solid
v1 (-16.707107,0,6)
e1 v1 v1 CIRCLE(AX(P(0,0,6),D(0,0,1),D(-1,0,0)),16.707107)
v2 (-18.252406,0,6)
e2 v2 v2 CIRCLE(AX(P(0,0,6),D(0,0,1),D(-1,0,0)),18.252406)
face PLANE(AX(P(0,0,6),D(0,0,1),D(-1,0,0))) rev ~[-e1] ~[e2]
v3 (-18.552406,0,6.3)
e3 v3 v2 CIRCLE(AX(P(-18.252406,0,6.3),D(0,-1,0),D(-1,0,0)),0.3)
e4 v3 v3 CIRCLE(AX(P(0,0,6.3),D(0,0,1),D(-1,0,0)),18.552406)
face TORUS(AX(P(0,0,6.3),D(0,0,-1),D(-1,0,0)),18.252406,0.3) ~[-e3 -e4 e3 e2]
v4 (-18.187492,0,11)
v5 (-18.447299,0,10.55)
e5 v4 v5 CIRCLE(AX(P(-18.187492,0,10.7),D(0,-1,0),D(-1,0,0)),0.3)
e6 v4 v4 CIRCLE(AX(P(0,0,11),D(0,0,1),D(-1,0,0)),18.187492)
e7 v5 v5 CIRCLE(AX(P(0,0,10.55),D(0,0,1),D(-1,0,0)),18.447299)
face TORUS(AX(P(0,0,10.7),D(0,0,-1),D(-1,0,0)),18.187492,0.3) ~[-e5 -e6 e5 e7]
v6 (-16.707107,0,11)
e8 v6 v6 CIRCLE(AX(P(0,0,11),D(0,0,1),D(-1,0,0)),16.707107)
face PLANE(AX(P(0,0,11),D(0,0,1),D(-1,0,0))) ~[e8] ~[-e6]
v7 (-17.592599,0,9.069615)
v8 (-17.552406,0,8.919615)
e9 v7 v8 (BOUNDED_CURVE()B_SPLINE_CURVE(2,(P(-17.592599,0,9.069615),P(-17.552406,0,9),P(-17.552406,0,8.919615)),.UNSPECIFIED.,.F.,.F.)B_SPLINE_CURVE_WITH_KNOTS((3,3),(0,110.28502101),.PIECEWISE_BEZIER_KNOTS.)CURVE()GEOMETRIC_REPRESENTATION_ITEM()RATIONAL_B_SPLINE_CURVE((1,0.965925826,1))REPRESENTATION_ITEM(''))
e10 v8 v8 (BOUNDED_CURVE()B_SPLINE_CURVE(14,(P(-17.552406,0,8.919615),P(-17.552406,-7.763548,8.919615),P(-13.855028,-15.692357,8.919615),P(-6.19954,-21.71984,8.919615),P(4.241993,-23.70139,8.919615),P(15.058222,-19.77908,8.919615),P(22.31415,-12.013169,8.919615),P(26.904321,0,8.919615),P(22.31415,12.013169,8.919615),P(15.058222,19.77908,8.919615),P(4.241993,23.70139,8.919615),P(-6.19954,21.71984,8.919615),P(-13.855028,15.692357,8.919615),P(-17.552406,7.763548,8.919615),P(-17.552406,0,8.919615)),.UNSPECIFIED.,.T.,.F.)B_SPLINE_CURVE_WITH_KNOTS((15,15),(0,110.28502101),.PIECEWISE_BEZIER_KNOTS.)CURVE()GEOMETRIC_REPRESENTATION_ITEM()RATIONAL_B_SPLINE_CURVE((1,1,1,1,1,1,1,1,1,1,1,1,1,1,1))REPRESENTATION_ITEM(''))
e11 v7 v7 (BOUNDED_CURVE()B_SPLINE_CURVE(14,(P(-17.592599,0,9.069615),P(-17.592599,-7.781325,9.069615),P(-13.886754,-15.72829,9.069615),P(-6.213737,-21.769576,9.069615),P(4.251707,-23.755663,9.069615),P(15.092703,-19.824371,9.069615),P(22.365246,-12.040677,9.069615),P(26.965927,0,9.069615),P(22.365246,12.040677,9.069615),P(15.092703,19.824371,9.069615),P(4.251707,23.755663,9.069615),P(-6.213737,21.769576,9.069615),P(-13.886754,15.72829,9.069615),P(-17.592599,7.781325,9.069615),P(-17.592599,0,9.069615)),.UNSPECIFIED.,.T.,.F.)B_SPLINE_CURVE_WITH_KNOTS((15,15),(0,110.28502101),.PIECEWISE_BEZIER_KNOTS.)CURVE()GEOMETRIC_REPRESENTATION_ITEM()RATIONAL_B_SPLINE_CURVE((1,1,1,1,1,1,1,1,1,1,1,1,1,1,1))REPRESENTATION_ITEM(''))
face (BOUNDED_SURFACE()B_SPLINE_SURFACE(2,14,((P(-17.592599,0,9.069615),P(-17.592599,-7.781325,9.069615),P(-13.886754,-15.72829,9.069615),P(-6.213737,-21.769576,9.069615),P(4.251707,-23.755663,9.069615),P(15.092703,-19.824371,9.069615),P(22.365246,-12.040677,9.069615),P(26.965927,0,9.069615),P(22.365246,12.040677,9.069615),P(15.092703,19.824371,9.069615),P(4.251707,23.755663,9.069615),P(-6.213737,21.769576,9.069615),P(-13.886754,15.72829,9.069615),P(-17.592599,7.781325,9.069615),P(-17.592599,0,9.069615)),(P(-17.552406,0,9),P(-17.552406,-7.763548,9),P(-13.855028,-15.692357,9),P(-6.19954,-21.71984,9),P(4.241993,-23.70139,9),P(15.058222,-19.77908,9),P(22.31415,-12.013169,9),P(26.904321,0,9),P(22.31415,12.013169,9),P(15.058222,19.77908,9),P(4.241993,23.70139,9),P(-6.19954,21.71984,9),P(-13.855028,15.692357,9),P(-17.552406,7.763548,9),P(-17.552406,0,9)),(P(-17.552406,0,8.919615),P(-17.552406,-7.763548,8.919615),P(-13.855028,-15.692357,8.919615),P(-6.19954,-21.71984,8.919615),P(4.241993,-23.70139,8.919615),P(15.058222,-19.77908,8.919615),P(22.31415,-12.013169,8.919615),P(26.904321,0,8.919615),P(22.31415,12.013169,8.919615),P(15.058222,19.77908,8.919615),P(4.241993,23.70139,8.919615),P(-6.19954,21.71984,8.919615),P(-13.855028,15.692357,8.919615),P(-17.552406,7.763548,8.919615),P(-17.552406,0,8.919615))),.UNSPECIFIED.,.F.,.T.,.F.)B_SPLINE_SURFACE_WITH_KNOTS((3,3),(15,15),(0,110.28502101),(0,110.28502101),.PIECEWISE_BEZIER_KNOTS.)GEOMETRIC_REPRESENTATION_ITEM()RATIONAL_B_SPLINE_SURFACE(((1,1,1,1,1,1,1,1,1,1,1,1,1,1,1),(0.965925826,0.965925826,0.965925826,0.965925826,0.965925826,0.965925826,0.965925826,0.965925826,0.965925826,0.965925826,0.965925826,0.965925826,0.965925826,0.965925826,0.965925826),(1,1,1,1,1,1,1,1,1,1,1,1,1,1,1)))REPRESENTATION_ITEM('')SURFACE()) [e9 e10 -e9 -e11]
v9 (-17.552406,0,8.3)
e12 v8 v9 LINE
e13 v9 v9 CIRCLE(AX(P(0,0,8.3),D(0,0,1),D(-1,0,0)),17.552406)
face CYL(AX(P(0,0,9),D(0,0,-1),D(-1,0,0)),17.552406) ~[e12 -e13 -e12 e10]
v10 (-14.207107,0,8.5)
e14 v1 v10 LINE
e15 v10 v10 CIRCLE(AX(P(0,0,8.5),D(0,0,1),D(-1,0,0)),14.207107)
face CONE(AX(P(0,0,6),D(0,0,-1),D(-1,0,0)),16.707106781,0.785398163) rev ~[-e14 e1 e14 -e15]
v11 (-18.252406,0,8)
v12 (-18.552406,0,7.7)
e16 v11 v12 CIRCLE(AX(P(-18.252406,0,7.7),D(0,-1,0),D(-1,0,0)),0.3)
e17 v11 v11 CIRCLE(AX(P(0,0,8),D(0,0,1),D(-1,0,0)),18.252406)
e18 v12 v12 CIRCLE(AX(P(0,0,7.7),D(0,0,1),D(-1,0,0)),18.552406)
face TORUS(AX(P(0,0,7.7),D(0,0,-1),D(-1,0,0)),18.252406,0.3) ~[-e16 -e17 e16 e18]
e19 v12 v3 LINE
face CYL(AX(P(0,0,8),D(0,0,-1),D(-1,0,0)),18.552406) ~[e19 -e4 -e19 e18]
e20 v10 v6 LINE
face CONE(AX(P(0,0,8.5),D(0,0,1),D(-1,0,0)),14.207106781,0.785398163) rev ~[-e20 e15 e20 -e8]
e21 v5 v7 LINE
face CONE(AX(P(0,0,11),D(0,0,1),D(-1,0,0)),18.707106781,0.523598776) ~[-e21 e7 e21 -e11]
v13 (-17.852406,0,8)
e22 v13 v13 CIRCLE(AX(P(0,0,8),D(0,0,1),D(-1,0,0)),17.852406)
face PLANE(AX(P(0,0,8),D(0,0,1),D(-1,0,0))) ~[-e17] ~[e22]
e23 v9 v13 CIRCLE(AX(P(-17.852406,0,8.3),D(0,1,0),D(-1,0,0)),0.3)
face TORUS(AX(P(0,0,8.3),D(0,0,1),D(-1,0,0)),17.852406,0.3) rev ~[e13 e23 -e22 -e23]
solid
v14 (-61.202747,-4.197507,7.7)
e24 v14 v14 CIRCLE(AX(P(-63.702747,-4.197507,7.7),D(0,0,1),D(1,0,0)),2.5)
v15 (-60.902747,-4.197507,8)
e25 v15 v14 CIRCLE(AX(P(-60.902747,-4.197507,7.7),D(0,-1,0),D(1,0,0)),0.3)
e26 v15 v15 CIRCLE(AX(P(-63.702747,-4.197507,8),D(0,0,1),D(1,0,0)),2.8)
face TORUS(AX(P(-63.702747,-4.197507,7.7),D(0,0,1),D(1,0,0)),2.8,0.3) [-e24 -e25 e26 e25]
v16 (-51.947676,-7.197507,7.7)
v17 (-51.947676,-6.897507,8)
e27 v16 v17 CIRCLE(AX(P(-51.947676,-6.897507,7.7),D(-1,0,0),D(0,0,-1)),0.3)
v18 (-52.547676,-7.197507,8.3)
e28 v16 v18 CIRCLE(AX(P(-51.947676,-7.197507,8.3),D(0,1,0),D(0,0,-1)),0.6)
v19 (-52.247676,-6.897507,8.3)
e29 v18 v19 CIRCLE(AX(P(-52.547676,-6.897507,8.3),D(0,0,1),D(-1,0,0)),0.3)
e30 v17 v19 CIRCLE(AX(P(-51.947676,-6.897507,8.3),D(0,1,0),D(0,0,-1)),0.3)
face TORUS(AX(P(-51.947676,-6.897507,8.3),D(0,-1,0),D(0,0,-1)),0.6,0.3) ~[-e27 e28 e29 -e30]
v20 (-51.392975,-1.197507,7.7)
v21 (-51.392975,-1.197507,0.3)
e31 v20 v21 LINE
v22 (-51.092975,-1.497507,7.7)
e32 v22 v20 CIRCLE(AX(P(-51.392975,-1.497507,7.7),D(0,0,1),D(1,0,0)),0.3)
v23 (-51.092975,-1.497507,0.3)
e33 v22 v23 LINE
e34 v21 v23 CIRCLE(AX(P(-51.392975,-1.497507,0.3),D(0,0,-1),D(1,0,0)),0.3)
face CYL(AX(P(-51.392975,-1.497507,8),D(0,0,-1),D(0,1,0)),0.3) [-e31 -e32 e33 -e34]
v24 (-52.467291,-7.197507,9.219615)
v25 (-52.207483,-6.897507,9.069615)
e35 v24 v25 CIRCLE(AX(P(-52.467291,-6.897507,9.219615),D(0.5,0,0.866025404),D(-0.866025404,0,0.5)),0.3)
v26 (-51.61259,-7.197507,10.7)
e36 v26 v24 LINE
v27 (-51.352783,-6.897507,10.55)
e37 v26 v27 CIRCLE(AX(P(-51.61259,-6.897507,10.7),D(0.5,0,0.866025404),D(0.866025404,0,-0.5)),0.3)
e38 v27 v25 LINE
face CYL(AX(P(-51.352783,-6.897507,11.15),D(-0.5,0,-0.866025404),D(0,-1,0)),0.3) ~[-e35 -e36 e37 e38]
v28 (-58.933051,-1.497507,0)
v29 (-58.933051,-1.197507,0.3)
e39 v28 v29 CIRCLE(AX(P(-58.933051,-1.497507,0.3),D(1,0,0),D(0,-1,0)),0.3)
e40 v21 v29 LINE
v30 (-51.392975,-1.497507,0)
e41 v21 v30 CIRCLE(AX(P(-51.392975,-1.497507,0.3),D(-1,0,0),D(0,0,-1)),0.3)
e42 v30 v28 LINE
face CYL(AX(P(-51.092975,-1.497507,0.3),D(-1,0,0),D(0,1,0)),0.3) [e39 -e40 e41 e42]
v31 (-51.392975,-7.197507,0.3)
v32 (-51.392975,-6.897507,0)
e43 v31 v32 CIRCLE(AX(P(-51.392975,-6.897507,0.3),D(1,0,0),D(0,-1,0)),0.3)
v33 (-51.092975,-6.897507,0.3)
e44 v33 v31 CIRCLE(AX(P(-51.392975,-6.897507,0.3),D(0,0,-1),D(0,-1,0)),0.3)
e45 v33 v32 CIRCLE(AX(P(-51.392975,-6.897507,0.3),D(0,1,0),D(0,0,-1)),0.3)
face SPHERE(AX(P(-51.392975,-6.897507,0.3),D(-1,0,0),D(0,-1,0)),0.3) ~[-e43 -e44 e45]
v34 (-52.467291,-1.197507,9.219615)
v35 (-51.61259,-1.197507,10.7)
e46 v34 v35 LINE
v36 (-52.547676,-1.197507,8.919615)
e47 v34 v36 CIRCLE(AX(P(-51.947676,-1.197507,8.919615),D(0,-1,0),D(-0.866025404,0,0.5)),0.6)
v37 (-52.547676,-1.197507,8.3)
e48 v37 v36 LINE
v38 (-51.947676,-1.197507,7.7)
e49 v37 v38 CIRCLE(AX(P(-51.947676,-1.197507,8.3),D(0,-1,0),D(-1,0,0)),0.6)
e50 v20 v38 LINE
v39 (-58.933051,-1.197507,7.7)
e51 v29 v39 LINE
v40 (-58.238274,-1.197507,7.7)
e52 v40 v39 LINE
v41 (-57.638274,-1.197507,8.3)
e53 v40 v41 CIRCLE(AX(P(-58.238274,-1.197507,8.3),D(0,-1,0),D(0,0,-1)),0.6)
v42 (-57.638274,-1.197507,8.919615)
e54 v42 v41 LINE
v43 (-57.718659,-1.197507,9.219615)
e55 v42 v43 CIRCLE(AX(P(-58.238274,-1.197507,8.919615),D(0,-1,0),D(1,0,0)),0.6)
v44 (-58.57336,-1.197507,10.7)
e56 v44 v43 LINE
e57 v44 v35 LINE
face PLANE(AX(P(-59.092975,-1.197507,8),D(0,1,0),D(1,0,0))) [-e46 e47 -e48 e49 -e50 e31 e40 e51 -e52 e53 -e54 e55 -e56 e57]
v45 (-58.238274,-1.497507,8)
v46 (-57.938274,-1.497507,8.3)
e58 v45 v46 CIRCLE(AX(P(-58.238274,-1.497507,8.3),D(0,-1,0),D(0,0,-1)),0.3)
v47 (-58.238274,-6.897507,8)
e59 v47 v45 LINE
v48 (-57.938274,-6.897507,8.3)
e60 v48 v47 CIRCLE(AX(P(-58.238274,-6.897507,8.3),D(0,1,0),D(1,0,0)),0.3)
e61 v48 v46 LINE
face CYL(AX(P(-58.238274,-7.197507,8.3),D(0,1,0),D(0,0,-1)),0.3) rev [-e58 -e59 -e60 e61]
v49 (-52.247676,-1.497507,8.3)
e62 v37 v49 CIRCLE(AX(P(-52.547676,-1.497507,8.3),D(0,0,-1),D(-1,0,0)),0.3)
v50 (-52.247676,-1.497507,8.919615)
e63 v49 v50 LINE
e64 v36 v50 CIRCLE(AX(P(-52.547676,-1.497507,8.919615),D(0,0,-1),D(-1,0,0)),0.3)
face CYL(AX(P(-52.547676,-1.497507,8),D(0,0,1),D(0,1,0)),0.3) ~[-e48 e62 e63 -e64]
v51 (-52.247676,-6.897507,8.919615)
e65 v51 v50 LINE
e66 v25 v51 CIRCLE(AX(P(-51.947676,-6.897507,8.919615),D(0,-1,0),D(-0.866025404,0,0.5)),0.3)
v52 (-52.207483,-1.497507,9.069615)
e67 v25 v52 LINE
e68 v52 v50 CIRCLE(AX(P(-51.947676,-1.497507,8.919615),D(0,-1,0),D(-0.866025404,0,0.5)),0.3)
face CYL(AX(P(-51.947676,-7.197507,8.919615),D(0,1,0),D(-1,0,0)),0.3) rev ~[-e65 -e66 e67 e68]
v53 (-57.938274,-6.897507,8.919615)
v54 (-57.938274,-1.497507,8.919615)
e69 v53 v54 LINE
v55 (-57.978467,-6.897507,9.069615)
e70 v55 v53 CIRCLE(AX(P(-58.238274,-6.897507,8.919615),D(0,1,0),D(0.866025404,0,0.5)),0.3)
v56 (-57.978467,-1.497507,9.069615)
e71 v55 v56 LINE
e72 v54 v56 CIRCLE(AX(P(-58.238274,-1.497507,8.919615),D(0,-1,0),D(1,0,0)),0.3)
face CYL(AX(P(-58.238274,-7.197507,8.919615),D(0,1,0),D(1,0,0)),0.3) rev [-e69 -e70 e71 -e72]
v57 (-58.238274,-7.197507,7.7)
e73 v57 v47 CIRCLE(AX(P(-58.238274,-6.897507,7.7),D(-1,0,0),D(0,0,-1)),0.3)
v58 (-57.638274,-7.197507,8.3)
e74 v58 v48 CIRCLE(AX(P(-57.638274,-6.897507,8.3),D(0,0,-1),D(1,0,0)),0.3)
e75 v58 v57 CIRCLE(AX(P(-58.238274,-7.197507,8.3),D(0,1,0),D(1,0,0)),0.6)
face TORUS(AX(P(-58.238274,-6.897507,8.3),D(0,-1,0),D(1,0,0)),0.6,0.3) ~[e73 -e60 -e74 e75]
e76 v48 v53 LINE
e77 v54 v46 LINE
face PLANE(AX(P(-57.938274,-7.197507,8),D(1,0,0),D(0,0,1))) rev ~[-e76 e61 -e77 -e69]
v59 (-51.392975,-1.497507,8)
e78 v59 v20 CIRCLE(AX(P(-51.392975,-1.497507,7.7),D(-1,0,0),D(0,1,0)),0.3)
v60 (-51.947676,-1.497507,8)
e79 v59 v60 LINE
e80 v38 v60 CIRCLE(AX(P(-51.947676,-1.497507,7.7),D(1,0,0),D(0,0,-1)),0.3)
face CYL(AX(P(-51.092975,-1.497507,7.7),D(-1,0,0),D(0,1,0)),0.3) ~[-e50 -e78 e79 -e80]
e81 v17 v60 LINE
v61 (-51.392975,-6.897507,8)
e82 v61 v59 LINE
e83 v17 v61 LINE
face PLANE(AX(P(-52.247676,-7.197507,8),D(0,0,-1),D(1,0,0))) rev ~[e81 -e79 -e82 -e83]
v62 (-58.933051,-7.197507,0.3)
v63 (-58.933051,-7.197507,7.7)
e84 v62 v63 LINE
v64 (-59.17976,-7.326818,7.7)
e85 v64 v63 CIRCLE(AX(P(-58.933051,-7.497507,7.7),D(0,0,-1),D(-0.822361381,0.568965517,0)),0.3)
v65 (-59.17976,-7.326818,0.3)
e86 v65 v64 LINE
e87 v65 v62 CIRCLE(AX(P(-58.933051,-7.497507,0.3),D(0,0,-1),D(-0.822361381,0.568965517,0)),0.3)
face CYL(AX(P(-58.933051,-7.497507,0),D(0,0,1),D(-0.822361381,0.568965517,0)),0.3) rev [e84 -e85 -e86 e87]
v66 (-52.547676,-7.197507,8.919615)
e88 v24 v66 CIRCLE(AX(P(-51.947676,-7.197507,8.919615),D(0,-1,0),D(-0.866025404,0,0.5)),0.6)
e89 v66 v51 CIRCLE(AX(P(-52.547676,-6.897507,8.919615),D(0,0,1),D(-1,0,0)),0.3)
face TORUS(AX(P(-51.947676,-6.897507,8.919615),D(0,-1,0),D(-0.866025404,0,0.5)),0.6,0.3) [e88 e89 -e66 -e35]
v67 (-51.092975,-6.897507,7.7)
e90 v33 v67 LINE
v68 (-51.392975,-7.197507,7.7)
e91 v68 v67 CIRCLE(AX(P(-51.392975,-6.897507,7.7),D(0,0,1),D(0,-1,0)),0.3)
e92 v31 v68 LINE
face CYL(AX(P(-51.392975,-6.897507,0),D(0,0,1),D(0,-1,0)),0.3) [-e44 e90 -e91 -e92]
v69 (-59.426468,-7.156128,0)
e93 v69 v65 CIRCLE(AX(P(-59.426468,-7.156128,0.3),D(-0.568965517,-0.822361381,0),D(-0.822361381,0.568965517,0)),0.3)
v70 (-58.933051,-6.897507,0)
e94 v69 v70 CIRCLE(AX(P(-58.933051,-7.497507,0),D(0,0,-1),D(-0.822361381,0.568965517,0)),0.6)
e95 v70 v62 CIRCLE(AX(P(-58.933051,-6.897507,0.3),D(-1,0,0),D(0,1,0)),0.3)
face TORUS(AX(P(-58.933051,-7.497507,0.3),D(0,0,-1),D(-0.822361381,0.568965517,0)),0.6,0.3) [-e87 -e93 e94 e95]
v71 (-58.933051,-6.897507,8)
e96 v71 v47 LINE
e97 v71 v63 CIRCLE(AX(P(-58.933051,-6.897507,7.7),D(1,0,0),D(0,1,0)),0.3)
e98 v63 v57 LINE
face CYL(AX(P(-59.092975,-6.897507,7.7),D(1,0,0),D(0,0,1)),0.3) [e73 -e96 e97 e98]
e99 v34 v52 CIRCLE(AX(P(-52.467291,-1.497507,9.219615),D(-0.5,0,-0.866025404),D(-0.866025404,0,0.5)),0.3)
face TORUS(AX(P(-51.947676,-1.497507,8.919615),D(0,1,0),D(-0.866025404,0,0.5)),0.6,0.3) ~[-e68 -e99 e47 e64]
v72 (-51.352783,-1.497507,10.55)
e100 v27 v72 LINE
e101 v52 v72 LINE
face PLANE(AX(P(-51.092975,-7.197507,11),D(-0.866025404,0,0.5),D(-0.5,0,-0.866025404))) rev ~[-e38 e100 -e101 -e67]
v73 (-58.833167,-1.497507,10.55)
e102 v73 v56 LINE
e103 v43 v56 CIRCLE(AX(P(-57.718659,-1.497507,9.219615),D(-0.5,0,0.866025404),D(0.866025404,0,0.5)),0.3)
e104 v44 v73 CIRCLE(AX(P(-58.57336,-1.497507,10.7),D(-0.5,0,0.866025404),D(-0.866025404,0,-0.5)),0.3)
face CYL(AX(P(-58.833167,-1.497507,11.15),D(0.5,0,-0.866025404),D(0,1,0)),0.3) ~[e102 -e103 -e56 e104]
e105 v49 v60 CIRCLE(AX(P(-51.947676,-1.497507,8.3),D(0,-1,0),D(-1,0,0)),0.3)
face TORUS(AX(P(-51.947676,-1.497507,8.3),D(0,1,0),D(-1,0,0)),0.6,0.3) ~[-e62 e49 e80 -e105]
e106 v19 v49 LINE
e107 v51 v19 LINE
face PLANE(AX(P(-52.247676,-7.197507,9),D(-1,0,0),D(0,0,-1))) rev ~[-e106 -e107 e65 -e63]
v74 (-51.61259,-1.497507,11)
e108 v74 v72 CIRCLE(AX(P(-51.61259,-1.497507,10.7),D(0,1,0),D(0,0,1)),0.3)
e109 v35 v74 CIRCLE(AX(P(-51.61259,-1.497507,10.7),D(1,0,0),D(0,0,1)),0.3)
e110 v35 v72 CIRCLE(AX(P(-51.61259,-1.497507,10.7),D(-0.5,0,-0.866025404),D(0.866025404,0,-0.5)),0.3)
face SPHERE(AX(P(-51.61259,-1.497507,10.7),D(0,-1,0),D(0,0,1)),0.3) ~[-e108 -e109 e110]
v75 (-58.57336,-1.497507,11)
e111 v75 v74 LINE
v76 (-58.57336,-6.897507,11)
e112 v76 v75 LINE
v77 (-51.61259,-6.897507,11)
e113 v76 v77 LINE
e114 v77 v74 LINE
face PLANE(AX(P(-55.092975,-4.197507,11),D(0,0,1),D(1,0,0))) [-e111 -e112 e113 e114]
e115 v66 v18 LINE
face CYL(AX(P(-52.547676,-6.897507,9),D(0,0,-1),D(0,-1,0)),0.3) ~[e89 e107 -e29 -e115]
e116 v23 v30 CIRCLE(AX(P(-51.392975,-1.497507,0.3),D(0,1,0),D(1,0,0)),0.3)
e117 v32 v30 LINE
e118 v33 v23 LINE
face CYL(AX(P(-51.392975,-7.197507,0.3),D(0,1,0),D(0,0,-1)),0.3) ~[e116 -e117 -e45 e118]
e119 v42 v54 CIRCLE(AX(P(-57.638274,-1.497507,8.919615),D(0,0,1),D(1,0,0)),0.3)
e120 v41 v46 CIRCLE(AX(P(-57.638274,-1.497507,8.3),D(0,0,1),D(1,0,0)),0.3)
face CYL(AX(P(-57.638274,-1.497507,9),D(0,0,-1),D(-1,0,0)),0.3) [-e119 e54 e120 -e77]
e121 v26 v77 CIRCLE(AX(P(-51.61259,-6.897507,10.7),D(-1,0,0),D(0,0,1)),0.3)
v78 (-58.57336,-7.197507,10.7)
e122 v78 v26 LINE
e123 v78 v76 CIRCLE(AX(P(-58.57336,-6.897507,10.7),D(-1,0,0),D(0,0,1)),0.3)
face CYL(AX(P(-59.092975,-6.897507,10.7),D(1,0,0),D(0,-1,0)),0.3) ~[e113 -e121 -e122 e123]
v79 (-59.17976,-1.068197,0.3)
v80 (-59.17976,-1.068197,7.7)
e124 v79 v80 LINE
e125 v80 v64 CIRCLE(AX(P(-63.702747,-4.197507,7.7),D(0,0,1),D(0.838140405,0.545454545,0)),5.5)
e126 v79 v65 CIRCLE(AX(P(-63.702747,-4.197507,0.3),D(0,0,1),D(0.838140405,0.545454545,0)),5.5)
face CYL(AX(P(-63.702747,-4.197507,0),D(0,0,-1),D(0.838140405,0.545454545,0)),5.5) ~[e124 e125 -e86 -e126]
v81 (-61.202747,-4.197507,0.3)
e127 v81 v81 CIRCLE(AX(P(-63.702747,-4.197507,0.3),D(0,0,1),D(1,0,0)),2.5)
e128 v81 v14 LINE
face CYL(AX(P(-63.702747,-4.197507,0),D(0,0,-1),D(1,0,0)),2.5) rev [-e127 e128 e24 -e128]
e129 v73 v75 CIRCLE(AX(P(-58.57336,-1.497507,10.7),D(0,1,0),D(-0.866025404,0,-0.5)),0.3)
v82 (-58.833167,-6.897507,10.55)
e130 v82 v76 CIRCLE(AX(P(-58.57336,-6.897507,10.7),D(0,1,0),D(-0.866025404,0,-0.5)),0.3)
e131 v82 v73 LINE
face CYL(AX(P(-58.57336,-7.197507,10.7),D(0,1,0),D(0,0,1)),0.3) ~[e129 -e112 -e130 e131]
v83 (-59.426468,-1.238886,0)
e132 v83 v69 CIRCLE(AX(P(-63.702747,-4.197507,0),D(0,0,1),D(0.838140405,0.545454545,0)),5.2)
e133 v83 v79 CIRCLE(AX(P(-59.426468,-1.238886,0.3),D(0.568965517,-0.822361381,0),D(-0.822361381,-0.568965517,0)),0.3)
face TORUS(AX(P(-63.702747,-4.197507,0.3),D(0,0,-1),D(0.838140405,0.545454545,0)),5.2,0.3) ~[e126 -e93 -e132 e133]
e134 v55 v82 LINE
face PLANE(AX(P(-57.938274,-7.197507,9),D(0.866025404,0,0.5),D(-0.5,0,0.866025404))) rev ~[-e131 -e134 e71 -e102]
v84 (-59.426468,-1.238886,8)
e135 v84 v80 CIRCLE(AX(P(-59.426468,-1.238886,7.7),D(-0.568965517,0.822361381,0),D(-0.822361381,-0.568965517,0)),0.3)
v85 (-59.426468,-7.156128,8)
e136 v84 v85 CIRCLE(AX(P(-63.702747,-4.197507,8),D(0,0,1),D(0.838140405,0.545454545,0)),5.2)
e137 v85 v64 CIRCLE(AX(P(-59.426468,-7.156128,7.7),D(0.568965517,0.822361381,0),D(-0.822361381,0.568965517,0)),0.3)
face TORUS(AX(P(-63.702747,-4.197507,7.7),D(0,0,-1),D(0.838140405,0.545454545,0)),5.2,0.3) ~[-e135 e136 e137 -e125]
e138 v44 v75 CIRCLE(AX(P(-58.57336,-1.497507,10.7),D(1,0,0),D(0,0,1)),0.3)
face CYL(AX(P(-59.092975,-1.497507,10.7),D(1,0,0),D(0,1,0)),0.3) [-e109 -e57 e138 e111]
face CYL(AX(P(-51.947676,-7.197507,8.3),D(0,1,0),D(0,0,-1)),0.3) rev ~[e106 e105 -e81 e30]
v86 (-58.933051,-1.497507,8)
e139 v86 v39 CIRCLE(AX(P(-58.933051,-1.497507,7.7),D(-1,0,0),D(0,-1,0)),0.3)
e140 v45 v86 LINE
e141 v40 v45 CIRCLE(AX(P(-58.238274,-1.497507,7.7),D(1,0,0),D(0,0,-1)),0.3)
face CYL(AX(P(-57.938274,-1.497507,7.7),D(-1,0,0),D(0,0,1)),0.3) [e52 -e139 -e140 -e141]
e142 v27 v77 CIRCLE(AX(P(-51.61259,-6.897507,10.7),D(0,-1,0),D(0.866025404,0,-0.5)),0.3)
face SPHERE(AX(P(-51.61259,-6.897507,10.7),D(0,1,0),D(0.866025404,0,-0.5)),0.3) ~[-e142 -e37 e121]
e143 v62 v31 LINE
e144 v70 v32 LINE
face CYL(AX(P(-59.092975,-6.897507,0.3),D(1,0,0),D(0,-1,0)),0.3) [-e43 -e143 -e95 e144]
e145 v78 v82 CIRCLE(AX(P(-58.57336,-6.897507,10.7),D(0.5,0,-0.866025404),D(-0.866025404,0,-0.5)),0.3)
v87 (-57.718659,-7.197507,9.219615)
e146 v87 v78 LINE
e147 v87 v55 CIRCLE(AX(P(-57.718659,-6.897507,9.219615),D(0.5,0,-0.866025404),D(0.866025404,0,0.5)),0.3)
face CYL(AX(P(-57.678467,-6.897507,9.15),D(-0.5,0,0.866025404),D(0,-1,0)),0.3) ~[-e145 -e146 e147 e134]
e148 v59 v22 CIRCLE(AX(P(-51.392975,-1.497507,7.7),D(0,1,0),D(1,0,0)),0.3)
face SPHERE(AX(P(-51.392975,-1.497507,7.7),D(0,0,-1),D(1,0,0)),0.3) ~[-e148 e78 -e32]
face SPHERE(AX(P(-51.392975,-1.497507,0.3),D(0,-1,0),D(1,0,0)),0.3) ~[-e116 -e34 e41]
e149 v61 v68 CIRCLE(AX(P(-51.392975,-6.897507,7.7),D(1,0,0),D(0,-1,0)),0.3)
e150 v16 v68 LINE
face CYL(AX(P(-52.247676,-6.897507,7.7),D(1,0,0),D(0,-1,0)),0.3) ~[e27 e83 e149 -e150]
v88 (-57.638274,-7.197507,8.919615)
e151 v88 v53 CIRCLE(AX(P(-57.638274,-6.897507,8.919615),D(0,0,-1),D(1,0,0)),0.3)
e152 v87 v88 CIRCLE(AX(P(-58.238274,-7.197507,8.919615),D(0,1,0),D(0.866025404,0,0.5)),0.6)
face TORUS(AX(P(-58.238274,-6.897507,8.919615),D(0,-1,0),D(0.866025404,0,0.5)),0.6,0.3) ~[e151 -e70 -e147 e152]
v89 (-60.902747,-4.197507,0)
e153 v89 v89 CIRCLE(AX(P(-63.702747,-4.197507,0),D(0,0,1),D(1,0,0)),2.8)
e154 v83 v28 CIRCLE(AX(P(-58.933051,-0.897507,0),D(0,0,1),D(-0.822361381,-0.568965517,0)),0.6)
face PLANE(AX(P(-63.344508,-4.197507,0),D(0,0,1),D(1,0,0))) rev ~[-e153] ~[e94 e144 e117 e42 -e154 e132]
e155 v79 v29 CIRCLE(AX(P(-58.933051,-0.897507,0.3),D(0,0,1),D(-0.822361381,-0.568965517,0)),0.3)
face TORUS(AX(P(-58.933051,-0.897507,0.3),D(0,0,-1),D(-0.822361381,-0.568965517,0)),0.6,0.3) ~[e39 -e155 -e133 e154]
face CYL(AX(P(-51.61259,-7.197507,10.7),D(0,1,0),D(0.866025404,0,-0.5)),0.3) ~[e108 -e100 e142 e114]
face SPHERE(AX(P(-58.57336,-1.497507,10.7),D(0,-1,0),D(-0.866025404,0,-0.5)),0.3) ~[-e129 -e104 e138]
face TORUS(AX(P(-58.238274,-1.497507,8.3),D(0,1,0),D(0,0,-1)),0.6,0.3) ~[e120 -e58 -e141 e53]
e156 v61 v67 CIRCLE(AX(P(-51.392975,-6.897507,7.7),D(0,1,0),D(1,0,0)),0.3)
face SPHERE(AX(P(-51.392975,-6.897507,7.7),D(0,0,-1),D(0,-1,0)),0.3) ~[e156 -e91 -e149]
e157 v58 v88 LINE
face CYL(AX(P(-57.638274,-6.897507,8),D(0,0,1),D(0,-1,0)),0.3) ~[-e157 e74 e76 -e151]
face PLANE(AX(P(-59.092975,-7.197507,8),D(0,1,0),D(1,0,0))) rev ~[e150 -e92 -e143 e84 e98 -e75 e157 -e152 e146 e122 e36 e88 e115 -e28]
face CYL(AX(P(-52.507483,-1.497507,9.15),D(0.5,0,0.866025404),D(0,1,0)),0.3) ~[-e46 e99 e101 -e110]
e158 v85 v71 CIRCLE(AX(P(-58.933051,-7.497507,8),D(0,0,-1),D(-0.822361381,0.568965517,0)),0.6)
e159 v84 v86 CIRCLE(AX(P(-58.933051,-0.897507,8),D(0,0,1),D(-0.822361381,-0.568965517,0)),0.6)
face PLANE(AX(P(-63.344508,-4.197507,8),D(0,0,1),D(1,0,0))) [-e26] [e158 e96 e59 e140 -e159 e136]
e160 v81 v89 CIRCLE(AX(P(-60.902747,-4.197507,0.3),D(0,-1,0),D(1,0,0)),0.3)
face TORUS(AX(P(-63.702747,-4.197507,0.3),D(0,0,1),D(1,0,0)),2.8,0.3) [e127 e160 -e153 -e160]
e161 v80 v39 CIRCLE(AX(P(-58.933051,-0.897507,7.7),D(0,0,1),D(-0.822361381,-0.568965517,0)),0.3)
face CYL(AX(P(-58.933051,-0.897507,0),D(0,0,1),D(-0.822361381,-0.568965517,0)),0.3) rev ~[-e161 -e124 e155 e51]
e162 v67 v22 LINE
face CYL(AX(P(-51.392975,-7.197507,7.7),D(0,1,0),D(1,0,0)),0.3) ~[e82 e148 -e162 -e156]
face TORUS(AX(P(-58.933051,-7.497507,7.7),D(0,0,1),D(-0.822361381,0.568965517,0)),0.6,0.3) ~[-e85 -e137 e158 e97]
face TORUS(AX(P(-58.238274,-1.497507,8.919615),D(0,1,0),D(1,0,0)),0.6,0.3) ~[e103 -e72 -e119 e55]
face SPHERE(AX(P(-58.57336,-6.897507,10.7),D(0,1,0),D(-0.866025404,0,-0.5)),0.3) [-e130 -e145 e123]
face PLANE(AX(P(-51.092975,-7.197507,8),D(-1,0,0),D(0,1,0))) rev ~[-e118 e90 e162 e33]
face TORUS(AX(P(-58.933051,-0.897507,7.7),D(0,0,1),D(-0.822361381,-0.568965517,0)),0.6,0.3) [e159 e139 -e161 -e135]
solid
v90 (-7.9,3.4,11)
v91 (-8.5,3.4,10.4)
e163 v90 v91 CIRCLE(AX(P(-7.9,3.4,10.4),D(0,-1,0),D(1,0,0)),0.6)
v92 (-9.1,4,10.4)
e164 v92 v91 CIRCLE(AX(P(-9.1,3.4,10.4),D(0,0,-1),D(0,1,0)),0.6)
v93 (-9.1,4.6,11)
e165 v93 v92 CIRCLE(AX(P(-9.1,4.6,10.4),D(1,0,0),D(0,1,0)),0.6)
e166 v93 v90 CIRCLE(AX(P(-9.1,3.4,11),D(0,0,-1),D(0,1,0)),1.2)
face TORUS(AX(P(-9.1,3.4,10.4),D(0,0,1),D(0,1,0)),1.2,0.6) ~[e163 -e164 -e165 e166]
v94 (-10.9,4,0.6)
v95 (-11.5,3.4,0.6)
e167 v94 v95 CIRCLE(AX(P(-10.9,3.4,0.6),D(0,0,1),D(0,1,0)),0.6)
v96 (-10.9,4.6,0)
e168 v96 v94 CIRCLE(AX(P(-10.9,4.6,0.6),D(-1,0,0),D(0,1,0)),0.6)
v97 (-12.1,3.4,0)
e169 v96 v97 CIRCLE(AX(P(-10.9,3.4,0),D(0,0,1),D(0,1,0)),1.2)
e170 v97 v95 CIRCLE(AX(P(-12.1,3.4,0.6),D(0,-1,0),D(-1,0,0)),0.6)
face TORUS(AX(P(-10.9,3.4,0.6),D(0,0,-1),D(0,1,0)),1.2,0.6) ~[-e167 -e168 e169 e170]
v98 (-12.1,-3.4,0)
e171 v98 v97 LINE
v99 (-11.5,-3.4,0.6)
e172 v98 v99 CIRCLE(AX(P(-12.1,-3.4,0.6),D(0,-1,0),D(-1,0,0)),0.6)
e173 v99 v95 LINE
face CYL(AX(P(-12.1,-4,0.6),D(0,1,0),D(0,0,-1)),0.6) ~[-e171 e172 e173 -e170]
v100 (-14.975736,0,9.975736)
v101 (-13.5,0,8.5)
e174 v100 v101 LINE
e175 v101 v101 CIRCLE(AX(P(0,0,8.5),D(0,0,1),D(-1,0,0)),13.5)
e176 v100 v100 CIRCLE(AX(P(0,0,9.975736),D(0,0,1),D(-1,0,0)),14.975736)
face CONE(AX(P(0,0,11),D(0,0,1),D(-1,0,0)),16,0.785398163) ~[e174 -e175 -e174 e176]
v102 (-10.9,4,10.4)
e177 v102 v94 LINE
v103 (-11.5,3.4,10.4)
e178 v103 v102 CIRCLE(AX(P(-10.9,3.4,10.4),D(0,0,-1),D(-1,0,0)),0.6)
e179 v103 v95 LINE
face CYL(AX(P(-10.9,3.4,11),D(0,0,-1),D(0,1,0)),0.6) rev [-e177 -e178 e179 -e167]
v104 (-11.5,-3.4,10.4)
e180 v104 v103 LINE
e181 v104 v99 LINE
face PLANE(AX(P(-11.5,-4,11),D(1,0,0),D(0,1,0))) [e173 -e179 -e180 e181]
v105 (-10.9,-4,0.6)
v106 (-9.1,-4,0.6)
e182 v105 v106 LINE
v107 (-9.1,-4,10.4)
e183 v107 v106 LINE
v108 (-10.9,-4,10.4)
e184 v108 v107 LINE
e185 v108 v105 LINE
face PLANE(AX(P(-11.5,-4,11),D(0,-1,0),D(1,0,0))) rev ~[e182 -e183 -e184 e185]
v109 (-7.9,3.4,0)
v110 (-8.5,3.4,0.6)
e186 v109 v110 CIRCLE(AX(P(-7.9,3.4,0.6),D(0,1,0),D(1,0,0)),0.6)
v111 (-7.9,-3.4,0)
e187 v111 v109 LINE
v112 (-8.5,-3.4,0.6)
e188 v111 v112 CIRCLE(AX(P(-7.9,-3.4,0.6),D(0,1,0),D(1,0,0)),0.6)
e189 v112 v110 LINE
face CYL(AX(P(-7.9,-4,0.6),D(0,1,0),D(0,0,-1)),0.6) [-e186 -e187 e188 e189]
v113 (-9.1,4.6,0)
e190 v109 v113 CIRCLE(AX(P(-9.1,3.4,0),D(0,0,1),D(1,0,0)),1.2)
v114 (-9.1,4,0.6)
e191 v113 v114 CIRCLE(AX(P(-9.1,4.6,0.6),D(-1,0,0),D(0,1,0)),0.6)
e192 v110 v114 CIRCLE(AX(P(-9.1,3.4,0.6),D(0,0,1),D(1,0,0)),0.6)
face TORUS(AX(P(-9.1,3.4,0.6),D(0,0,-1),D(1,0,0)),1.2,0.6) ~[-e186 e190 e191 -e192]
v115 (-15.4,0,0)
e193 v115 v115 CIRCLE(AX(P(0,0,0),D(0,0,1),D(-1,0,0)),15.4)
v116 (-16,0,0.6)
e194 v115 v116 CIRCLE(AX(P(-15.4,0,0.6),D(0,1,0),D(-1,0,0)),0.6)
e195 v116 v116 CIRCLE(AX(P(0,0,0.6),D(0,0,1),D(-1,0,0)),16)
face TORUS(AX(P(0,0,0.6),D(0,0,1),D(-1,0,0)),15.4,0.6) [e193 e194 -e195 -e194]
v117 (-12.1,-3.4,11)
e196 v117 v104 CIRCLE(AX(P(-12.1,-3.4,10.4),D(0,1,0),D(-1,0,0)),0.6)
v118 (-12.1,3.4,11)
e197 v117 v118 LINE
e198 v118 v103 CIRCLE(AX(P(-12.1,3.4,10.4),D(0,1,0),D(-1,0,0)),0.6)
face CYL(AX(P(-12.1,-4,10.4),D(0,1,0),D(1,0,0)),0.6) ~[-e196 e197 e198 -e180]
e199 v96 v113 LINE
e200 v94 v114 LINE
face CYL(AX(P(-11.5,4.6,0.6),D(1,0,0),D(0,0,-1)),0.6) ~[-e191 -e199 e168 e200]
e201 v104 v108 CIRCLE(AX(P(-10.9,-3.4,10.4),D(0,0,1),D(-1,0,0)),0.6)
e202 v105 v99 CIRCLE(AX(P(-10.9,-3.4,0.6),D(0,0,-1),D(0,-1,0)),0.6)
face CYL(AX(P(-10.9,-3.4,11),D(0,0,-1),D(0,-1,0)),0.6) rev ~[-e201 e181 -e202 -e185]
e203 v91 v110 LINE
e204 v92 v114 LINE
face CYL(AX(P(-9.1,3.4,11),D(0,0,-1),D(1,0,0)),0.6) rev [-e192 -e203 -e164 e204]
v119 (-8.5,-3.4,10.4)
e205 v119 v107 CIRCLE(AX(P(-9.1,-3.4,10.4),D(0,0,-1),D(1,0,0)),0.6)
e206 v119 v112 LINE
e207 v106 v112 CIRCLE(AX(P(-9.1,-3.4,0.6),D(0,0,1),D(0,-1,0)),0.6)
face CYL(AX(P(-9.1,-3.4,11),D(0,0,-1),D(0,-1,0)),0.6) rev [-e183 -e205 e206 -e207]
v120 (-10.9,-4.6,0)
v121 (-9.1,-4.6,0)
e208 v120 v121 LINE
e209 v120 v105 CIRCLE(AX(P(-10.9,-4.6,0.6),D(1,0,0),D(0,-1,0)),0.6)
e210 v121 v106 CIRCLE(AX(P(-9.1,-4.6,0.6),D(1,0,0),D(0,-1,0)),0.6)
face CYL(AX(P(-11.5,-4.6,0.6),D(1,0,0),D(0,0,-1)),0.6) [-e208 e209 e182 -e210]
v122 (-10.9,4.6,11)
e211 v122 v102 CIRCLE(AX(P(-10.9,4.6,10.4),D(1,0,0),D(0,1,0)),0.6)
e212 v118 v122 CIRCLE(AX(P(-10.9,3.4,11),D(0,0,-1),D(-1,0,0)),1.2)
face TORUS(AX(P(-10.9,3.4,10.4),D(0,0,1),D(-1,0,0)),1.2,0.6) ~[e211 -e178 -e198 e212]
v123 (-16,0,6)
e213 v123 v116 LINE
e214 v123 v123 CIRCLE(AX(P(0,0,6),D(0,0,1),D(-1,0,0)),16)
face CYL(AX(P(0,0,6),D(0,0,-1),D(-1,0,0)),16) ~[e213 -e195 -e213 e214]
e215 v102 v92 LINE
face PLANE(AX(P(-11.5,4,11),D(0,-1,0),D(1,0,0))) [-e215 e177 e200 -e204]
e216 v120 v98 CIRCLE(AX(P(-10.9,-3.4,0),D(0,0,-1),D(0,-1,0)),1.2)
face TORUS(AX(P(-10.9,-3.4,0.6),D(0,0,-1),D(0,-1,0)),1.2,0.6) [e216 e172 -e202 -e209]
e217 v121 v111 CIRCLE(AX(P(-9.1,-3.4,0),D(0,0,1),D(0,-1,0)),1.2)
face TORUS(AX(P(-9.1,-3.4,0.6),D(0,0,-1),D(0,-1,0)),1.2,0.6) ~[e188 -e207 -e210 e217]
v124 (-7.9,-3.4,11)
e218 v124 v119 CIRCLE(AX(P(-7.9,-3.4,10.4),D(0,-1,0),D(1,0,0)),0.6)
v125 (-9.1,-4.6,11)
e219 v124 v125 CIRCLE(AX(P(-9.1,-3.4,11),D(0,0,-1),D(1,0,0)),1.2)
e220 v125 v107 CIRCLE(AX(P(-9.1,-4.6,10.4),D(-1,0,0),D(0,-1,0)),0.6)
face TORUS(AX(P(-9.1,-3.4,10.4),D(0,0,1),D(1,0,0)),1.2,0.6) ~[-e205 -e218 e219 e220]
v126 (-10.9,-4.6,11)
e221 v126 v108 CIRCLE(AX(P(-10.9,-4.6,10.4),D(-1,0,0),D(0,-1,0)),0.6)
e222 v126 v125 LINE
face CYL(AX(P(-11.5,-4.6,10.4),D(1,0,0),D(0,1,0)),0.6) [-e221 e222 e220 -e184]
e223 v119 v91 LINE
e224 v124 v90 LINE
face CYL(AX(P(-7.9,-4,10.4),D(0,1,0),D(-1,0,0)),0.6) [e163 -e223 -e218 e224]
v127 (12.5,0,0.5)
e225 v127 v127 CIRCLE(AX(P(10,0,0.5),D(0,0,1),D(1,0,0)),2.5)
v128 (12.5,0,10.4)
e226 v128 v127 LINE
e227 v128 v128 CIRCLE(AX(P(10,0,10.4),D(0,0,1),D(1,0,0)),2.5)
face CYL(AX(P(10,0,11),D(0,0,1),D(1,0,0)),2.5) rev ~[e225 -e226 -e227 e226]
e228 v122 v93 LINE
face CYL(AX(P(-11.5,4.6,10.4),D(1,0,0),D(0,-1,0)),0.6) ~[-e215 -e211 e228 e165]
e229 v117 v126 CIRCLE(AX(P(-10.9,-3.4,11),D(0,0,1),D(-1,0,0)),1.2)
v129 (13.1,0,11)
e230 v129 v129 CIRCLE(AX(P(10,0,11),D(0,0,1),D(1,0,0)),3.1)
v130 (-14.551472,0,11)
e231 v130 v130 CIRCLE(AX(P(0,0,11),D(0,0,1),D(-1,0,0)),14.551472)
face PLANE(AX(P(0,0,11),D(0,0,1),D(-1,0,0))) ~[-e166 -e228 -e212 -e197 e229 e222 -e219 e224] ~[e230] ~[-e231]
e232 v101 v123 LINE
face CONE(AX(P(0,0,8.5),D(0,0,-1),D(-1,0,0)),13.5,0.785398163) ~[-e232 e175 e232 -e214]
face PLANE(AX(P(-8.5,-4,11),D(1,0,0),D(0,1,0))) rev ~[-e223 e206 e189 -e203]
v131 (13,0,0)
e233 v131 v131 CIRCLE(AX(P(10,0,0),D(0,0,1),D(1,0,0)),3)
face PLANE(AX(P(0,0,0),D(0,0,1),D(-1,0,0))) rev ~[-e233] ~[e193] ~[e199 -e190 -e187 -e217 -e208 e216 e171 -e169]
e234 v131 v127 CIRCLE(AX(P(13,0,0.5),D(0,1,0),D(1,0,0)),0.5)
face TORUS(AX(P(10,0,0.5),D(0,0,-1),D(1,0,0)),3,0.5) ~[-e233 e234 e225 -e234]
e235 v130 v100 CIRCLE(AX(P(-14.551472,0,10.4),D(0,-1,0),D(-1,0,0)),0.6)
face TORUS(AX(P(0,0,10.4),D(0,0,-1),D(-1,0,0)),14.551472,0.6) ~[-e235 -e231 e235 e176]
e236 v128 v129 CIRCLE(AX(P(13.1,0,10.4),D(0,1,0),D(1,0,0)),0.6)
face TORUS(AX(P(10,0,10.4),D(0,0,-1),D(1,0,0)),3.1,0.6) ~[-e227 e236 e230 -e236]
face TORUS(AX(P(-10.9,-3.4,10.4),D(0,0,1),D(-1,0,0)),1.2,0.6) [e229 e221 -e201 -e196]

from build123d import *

# Parameters (mm, degrees)
F4_R      = 2.5
F5_DEPTH  = 11.001
F4_W      = 3
F4_H      = 8
F6_DEPTH  = 11.001
F7_R      = 0.5
F8_R      = 0.6
F9_R      = 0.3
F10_R     = 2.5
F11_DEPTH = 8
F12_W     = 8
F12_H     = 6
F13_DEPTH = 3
F15_DEPTH = 25.7509134082
F16_R     = 0.3


# Not quite as in the source:
# - a feature names something its author has since deleted; it is built from what else it names


with BuildPart() as f3:
    # F2 (on Front) → F3 (revolve)
    with BuildSketch(Plane.XZ):
        Polygon((-16, 0), (0, 0), (0, 11), (-16, 11), (-13.5, 8.5), (-16, 6), align=None)
    revolve(axis=Axis((0, 0, 5.5), (0, 0, 1)))

    # F4 (on face) → F5 (cut, through all)
    with BuildSketch(Plane.XY.offset(11)):
        with Locations((10, 0)):
            Circle(F4_R)
    extrude(amount=-F5_DEPTH, mode=Mode.SUBTRACT)

    # F4 (on face) → F6 (cut, through all)
    with BuildSketch(Plane.XY.offset(11)):
        with Locations((10, 0)):
            Circle(F4_R)
        with Locations((-10, 0)):
            Rectangle(F4_W, F4_H)
    extrude(amount=-F6_DEPTH, mode=Mode.SUBTRACT)

    # F7
    f7_edges = [f3.edges().sort_by_distance(p)[0] for p in [
        (7.5, 0, 0),
    ]]
    fillet(f7_edges, radius=F7_R)

    # F8
    f8_edges = [f3.edges().sort_by_distance(p)[0] for p in [
        (16, 0, 11),
        (-11.5, 0, 11),
        (-10, 4, 11),
        (-8.5, 0, 11),
        (-10, -4, 11),
        (7.5, 0, 11),
        (7, 0, 0),
        (16, 0, 0),
        (-10, -4, 0),
        (-8.5, 0, 0),
        (-10, 4, 0),
        (-11.5, 0, 0),
        (-11.5, 4, 5.5),
        (-8.5, 4, 5.5),
        (-8.5, -4, 5.5),
        (-11.5, -4, 5.5),
    ]]
    fillet(f8_edges, radius=F8_R)


with BuildPart() as f3b:
    # F2 (on Front) → F3, piece 2 (revolve)
    with BuildSketch(Plane.XZ):
        Polygon((-16.7071067812, 6), (-14.2071067812, 8.5), (-16.7071067812, 11), (-18.7071067812, 11), (-17.5524062428, 9), (-17.5524062428, 8), (-18.5524062428, 8), (-18.5524062428, 6), align=None)
    revolve(axis=Axis((0, 0, 5.5), (0, 0, 1)))

    # F9
    f9_edges = [f3b.edges().sort_by_distance(p)[0] for p in [
        (17.552406, 0, 9),
        (17.552406, 0, 8),
        (-17.552406, 0, 8.5),
        (18.552406, 0, 8),
        (18.552406, 0, 6),
        (-18.552406, 0, 7),
        (18.707107, 0, 11),
        (-18.129757, 0, 10),
    ]]
    fillet(f9_edges, radius=F9_R)


with BuildPart() as f11:
    # F10 (on Top) → F11 (new body)
    with BuildSketch(Plane.XY):
        with BuildLine():
            ThreePointArc((-59.0929749971, -7.1975071654), (-58.4299990212, -5.7621561264), (-58.2027472258, -4.1975071654))
            ThreePointArc((-58.2027472258, -4.1975071654), (-58.4299990212, -2.6328582044), (-59.0929749971, -1.1975071654))
            ThreePointArc((-59.0929749971, -1.1975071654), (-69.2027472258, -4.1975071654), (-59.0929749971, -7.1975071654))
        make_face()
        with Locations((-63.7027472258, -4.1975071654)):
            Circle(F10_R, mode=Mode.SUBTRACT)
        with BuildLine():
            ThreePointArc((-59.0929749971, -1.1975071654), (-58.4299990212, -2.6328582044), (-58.2027472258, -4.1975071654))
            ThreePointArc((-58.2027472258, -4.1975071654), (-58.4299990212, -5.7621561264), (-59.0929749971, -7.1975071654))
            Line((-59.0929749971, -7.1975071654), (-51.0929749971, -7.1975071654))
            Line((-51.0929749971, -7.1975071654), (-51.0929749971, -1.1975071654))
            Line((-51.0929749971, -1.1975071654), (-59.0929749971, -1.1975071654))
        make_face()
    extrude(amount=F11_DEPTH)

    # F12 (on face) → F13 (join)
    with BuildSketch(Plane.XY.offset(8)):
        with Locations((-55.0929749971, -4.1975071654)):
            Rectangle(F12_W, F12_H)
    extrude(amount=F13_DEPTH)

    # F14 (on face) → F15 (cut, through all)
    with BuildSketch(Plane.XZ.offset(7.1975071654)):
        Polygon((-59.0929749971, 11), (-59.0929749971, 8), (-57.9382744587, 8), (-57.9382744587, 9), align=None)
        Polygon((-52.2476755355, 9), (-52.2476755355, 8), (-51.0929749971, 8), (-51.0929749971, 11), align=None)
    extrude(amount=-F15_DEPTH, mode=Mode.SUBTRACT)

    # F16
    f16_edges = [f11.edges().sort_by_distance(p)[0] for p in [
        (-55.092975, -7.197507, 11),
        (-51.092975, -4.197507, 11),
        (-55.092975, -1.197507, 11),
        (-59.092975, -4.197507, 11),
        (-69.202747, -4.197507, 8),
        (-58.515625, -7.197507, 8),
        (-57.938274, -4.197507, 8),
        (-58.515625, -1.197507, 8),
        (-66.202747, -4.197507, 8),
        (-57.938274, -7.197507, 8.5),
        (-57.938274, -4.197507, 9),
        (-57.938274, -1.197507, 8.5),
        (-52.247676, -7.197507, 8.5),
        (-52.247676, -4.197507, 8),
        (-52.247676, -1.197507, 8.5),
        (-52.247676, -4.197507, 9),
        (-55.092975, -7.197507, 0),
        (-51.092975, -7.197507, 4),
        (-51.670325, -7.197507, 8),
        (-51.670325, -7.197507, 10),
        (-58.515625, -7.197507, 10),
        (-59.092975, -7.197507, 4),
        (-51.092975, -4.197507, 0),
        (-51.092975, -1.197507, 4),
        (-51.092975, -4.197507, 8),
        (-66.202747, -4.197507, 0),
        (-51.670325, -1.197507, 10),
        (-51.670325, -1.197507, 8),
        (-55.092975, -1.197507, 0),
        (-59.092975, -1.197507, 4),
        (-58.515625, -1.197507, 10),
        (-69.202747, -4.197507, 0),
    ]]
    fillet(f16_edges, radius=F16_R)


solid = Compound([f3.part, f3b.part, f11.part])
